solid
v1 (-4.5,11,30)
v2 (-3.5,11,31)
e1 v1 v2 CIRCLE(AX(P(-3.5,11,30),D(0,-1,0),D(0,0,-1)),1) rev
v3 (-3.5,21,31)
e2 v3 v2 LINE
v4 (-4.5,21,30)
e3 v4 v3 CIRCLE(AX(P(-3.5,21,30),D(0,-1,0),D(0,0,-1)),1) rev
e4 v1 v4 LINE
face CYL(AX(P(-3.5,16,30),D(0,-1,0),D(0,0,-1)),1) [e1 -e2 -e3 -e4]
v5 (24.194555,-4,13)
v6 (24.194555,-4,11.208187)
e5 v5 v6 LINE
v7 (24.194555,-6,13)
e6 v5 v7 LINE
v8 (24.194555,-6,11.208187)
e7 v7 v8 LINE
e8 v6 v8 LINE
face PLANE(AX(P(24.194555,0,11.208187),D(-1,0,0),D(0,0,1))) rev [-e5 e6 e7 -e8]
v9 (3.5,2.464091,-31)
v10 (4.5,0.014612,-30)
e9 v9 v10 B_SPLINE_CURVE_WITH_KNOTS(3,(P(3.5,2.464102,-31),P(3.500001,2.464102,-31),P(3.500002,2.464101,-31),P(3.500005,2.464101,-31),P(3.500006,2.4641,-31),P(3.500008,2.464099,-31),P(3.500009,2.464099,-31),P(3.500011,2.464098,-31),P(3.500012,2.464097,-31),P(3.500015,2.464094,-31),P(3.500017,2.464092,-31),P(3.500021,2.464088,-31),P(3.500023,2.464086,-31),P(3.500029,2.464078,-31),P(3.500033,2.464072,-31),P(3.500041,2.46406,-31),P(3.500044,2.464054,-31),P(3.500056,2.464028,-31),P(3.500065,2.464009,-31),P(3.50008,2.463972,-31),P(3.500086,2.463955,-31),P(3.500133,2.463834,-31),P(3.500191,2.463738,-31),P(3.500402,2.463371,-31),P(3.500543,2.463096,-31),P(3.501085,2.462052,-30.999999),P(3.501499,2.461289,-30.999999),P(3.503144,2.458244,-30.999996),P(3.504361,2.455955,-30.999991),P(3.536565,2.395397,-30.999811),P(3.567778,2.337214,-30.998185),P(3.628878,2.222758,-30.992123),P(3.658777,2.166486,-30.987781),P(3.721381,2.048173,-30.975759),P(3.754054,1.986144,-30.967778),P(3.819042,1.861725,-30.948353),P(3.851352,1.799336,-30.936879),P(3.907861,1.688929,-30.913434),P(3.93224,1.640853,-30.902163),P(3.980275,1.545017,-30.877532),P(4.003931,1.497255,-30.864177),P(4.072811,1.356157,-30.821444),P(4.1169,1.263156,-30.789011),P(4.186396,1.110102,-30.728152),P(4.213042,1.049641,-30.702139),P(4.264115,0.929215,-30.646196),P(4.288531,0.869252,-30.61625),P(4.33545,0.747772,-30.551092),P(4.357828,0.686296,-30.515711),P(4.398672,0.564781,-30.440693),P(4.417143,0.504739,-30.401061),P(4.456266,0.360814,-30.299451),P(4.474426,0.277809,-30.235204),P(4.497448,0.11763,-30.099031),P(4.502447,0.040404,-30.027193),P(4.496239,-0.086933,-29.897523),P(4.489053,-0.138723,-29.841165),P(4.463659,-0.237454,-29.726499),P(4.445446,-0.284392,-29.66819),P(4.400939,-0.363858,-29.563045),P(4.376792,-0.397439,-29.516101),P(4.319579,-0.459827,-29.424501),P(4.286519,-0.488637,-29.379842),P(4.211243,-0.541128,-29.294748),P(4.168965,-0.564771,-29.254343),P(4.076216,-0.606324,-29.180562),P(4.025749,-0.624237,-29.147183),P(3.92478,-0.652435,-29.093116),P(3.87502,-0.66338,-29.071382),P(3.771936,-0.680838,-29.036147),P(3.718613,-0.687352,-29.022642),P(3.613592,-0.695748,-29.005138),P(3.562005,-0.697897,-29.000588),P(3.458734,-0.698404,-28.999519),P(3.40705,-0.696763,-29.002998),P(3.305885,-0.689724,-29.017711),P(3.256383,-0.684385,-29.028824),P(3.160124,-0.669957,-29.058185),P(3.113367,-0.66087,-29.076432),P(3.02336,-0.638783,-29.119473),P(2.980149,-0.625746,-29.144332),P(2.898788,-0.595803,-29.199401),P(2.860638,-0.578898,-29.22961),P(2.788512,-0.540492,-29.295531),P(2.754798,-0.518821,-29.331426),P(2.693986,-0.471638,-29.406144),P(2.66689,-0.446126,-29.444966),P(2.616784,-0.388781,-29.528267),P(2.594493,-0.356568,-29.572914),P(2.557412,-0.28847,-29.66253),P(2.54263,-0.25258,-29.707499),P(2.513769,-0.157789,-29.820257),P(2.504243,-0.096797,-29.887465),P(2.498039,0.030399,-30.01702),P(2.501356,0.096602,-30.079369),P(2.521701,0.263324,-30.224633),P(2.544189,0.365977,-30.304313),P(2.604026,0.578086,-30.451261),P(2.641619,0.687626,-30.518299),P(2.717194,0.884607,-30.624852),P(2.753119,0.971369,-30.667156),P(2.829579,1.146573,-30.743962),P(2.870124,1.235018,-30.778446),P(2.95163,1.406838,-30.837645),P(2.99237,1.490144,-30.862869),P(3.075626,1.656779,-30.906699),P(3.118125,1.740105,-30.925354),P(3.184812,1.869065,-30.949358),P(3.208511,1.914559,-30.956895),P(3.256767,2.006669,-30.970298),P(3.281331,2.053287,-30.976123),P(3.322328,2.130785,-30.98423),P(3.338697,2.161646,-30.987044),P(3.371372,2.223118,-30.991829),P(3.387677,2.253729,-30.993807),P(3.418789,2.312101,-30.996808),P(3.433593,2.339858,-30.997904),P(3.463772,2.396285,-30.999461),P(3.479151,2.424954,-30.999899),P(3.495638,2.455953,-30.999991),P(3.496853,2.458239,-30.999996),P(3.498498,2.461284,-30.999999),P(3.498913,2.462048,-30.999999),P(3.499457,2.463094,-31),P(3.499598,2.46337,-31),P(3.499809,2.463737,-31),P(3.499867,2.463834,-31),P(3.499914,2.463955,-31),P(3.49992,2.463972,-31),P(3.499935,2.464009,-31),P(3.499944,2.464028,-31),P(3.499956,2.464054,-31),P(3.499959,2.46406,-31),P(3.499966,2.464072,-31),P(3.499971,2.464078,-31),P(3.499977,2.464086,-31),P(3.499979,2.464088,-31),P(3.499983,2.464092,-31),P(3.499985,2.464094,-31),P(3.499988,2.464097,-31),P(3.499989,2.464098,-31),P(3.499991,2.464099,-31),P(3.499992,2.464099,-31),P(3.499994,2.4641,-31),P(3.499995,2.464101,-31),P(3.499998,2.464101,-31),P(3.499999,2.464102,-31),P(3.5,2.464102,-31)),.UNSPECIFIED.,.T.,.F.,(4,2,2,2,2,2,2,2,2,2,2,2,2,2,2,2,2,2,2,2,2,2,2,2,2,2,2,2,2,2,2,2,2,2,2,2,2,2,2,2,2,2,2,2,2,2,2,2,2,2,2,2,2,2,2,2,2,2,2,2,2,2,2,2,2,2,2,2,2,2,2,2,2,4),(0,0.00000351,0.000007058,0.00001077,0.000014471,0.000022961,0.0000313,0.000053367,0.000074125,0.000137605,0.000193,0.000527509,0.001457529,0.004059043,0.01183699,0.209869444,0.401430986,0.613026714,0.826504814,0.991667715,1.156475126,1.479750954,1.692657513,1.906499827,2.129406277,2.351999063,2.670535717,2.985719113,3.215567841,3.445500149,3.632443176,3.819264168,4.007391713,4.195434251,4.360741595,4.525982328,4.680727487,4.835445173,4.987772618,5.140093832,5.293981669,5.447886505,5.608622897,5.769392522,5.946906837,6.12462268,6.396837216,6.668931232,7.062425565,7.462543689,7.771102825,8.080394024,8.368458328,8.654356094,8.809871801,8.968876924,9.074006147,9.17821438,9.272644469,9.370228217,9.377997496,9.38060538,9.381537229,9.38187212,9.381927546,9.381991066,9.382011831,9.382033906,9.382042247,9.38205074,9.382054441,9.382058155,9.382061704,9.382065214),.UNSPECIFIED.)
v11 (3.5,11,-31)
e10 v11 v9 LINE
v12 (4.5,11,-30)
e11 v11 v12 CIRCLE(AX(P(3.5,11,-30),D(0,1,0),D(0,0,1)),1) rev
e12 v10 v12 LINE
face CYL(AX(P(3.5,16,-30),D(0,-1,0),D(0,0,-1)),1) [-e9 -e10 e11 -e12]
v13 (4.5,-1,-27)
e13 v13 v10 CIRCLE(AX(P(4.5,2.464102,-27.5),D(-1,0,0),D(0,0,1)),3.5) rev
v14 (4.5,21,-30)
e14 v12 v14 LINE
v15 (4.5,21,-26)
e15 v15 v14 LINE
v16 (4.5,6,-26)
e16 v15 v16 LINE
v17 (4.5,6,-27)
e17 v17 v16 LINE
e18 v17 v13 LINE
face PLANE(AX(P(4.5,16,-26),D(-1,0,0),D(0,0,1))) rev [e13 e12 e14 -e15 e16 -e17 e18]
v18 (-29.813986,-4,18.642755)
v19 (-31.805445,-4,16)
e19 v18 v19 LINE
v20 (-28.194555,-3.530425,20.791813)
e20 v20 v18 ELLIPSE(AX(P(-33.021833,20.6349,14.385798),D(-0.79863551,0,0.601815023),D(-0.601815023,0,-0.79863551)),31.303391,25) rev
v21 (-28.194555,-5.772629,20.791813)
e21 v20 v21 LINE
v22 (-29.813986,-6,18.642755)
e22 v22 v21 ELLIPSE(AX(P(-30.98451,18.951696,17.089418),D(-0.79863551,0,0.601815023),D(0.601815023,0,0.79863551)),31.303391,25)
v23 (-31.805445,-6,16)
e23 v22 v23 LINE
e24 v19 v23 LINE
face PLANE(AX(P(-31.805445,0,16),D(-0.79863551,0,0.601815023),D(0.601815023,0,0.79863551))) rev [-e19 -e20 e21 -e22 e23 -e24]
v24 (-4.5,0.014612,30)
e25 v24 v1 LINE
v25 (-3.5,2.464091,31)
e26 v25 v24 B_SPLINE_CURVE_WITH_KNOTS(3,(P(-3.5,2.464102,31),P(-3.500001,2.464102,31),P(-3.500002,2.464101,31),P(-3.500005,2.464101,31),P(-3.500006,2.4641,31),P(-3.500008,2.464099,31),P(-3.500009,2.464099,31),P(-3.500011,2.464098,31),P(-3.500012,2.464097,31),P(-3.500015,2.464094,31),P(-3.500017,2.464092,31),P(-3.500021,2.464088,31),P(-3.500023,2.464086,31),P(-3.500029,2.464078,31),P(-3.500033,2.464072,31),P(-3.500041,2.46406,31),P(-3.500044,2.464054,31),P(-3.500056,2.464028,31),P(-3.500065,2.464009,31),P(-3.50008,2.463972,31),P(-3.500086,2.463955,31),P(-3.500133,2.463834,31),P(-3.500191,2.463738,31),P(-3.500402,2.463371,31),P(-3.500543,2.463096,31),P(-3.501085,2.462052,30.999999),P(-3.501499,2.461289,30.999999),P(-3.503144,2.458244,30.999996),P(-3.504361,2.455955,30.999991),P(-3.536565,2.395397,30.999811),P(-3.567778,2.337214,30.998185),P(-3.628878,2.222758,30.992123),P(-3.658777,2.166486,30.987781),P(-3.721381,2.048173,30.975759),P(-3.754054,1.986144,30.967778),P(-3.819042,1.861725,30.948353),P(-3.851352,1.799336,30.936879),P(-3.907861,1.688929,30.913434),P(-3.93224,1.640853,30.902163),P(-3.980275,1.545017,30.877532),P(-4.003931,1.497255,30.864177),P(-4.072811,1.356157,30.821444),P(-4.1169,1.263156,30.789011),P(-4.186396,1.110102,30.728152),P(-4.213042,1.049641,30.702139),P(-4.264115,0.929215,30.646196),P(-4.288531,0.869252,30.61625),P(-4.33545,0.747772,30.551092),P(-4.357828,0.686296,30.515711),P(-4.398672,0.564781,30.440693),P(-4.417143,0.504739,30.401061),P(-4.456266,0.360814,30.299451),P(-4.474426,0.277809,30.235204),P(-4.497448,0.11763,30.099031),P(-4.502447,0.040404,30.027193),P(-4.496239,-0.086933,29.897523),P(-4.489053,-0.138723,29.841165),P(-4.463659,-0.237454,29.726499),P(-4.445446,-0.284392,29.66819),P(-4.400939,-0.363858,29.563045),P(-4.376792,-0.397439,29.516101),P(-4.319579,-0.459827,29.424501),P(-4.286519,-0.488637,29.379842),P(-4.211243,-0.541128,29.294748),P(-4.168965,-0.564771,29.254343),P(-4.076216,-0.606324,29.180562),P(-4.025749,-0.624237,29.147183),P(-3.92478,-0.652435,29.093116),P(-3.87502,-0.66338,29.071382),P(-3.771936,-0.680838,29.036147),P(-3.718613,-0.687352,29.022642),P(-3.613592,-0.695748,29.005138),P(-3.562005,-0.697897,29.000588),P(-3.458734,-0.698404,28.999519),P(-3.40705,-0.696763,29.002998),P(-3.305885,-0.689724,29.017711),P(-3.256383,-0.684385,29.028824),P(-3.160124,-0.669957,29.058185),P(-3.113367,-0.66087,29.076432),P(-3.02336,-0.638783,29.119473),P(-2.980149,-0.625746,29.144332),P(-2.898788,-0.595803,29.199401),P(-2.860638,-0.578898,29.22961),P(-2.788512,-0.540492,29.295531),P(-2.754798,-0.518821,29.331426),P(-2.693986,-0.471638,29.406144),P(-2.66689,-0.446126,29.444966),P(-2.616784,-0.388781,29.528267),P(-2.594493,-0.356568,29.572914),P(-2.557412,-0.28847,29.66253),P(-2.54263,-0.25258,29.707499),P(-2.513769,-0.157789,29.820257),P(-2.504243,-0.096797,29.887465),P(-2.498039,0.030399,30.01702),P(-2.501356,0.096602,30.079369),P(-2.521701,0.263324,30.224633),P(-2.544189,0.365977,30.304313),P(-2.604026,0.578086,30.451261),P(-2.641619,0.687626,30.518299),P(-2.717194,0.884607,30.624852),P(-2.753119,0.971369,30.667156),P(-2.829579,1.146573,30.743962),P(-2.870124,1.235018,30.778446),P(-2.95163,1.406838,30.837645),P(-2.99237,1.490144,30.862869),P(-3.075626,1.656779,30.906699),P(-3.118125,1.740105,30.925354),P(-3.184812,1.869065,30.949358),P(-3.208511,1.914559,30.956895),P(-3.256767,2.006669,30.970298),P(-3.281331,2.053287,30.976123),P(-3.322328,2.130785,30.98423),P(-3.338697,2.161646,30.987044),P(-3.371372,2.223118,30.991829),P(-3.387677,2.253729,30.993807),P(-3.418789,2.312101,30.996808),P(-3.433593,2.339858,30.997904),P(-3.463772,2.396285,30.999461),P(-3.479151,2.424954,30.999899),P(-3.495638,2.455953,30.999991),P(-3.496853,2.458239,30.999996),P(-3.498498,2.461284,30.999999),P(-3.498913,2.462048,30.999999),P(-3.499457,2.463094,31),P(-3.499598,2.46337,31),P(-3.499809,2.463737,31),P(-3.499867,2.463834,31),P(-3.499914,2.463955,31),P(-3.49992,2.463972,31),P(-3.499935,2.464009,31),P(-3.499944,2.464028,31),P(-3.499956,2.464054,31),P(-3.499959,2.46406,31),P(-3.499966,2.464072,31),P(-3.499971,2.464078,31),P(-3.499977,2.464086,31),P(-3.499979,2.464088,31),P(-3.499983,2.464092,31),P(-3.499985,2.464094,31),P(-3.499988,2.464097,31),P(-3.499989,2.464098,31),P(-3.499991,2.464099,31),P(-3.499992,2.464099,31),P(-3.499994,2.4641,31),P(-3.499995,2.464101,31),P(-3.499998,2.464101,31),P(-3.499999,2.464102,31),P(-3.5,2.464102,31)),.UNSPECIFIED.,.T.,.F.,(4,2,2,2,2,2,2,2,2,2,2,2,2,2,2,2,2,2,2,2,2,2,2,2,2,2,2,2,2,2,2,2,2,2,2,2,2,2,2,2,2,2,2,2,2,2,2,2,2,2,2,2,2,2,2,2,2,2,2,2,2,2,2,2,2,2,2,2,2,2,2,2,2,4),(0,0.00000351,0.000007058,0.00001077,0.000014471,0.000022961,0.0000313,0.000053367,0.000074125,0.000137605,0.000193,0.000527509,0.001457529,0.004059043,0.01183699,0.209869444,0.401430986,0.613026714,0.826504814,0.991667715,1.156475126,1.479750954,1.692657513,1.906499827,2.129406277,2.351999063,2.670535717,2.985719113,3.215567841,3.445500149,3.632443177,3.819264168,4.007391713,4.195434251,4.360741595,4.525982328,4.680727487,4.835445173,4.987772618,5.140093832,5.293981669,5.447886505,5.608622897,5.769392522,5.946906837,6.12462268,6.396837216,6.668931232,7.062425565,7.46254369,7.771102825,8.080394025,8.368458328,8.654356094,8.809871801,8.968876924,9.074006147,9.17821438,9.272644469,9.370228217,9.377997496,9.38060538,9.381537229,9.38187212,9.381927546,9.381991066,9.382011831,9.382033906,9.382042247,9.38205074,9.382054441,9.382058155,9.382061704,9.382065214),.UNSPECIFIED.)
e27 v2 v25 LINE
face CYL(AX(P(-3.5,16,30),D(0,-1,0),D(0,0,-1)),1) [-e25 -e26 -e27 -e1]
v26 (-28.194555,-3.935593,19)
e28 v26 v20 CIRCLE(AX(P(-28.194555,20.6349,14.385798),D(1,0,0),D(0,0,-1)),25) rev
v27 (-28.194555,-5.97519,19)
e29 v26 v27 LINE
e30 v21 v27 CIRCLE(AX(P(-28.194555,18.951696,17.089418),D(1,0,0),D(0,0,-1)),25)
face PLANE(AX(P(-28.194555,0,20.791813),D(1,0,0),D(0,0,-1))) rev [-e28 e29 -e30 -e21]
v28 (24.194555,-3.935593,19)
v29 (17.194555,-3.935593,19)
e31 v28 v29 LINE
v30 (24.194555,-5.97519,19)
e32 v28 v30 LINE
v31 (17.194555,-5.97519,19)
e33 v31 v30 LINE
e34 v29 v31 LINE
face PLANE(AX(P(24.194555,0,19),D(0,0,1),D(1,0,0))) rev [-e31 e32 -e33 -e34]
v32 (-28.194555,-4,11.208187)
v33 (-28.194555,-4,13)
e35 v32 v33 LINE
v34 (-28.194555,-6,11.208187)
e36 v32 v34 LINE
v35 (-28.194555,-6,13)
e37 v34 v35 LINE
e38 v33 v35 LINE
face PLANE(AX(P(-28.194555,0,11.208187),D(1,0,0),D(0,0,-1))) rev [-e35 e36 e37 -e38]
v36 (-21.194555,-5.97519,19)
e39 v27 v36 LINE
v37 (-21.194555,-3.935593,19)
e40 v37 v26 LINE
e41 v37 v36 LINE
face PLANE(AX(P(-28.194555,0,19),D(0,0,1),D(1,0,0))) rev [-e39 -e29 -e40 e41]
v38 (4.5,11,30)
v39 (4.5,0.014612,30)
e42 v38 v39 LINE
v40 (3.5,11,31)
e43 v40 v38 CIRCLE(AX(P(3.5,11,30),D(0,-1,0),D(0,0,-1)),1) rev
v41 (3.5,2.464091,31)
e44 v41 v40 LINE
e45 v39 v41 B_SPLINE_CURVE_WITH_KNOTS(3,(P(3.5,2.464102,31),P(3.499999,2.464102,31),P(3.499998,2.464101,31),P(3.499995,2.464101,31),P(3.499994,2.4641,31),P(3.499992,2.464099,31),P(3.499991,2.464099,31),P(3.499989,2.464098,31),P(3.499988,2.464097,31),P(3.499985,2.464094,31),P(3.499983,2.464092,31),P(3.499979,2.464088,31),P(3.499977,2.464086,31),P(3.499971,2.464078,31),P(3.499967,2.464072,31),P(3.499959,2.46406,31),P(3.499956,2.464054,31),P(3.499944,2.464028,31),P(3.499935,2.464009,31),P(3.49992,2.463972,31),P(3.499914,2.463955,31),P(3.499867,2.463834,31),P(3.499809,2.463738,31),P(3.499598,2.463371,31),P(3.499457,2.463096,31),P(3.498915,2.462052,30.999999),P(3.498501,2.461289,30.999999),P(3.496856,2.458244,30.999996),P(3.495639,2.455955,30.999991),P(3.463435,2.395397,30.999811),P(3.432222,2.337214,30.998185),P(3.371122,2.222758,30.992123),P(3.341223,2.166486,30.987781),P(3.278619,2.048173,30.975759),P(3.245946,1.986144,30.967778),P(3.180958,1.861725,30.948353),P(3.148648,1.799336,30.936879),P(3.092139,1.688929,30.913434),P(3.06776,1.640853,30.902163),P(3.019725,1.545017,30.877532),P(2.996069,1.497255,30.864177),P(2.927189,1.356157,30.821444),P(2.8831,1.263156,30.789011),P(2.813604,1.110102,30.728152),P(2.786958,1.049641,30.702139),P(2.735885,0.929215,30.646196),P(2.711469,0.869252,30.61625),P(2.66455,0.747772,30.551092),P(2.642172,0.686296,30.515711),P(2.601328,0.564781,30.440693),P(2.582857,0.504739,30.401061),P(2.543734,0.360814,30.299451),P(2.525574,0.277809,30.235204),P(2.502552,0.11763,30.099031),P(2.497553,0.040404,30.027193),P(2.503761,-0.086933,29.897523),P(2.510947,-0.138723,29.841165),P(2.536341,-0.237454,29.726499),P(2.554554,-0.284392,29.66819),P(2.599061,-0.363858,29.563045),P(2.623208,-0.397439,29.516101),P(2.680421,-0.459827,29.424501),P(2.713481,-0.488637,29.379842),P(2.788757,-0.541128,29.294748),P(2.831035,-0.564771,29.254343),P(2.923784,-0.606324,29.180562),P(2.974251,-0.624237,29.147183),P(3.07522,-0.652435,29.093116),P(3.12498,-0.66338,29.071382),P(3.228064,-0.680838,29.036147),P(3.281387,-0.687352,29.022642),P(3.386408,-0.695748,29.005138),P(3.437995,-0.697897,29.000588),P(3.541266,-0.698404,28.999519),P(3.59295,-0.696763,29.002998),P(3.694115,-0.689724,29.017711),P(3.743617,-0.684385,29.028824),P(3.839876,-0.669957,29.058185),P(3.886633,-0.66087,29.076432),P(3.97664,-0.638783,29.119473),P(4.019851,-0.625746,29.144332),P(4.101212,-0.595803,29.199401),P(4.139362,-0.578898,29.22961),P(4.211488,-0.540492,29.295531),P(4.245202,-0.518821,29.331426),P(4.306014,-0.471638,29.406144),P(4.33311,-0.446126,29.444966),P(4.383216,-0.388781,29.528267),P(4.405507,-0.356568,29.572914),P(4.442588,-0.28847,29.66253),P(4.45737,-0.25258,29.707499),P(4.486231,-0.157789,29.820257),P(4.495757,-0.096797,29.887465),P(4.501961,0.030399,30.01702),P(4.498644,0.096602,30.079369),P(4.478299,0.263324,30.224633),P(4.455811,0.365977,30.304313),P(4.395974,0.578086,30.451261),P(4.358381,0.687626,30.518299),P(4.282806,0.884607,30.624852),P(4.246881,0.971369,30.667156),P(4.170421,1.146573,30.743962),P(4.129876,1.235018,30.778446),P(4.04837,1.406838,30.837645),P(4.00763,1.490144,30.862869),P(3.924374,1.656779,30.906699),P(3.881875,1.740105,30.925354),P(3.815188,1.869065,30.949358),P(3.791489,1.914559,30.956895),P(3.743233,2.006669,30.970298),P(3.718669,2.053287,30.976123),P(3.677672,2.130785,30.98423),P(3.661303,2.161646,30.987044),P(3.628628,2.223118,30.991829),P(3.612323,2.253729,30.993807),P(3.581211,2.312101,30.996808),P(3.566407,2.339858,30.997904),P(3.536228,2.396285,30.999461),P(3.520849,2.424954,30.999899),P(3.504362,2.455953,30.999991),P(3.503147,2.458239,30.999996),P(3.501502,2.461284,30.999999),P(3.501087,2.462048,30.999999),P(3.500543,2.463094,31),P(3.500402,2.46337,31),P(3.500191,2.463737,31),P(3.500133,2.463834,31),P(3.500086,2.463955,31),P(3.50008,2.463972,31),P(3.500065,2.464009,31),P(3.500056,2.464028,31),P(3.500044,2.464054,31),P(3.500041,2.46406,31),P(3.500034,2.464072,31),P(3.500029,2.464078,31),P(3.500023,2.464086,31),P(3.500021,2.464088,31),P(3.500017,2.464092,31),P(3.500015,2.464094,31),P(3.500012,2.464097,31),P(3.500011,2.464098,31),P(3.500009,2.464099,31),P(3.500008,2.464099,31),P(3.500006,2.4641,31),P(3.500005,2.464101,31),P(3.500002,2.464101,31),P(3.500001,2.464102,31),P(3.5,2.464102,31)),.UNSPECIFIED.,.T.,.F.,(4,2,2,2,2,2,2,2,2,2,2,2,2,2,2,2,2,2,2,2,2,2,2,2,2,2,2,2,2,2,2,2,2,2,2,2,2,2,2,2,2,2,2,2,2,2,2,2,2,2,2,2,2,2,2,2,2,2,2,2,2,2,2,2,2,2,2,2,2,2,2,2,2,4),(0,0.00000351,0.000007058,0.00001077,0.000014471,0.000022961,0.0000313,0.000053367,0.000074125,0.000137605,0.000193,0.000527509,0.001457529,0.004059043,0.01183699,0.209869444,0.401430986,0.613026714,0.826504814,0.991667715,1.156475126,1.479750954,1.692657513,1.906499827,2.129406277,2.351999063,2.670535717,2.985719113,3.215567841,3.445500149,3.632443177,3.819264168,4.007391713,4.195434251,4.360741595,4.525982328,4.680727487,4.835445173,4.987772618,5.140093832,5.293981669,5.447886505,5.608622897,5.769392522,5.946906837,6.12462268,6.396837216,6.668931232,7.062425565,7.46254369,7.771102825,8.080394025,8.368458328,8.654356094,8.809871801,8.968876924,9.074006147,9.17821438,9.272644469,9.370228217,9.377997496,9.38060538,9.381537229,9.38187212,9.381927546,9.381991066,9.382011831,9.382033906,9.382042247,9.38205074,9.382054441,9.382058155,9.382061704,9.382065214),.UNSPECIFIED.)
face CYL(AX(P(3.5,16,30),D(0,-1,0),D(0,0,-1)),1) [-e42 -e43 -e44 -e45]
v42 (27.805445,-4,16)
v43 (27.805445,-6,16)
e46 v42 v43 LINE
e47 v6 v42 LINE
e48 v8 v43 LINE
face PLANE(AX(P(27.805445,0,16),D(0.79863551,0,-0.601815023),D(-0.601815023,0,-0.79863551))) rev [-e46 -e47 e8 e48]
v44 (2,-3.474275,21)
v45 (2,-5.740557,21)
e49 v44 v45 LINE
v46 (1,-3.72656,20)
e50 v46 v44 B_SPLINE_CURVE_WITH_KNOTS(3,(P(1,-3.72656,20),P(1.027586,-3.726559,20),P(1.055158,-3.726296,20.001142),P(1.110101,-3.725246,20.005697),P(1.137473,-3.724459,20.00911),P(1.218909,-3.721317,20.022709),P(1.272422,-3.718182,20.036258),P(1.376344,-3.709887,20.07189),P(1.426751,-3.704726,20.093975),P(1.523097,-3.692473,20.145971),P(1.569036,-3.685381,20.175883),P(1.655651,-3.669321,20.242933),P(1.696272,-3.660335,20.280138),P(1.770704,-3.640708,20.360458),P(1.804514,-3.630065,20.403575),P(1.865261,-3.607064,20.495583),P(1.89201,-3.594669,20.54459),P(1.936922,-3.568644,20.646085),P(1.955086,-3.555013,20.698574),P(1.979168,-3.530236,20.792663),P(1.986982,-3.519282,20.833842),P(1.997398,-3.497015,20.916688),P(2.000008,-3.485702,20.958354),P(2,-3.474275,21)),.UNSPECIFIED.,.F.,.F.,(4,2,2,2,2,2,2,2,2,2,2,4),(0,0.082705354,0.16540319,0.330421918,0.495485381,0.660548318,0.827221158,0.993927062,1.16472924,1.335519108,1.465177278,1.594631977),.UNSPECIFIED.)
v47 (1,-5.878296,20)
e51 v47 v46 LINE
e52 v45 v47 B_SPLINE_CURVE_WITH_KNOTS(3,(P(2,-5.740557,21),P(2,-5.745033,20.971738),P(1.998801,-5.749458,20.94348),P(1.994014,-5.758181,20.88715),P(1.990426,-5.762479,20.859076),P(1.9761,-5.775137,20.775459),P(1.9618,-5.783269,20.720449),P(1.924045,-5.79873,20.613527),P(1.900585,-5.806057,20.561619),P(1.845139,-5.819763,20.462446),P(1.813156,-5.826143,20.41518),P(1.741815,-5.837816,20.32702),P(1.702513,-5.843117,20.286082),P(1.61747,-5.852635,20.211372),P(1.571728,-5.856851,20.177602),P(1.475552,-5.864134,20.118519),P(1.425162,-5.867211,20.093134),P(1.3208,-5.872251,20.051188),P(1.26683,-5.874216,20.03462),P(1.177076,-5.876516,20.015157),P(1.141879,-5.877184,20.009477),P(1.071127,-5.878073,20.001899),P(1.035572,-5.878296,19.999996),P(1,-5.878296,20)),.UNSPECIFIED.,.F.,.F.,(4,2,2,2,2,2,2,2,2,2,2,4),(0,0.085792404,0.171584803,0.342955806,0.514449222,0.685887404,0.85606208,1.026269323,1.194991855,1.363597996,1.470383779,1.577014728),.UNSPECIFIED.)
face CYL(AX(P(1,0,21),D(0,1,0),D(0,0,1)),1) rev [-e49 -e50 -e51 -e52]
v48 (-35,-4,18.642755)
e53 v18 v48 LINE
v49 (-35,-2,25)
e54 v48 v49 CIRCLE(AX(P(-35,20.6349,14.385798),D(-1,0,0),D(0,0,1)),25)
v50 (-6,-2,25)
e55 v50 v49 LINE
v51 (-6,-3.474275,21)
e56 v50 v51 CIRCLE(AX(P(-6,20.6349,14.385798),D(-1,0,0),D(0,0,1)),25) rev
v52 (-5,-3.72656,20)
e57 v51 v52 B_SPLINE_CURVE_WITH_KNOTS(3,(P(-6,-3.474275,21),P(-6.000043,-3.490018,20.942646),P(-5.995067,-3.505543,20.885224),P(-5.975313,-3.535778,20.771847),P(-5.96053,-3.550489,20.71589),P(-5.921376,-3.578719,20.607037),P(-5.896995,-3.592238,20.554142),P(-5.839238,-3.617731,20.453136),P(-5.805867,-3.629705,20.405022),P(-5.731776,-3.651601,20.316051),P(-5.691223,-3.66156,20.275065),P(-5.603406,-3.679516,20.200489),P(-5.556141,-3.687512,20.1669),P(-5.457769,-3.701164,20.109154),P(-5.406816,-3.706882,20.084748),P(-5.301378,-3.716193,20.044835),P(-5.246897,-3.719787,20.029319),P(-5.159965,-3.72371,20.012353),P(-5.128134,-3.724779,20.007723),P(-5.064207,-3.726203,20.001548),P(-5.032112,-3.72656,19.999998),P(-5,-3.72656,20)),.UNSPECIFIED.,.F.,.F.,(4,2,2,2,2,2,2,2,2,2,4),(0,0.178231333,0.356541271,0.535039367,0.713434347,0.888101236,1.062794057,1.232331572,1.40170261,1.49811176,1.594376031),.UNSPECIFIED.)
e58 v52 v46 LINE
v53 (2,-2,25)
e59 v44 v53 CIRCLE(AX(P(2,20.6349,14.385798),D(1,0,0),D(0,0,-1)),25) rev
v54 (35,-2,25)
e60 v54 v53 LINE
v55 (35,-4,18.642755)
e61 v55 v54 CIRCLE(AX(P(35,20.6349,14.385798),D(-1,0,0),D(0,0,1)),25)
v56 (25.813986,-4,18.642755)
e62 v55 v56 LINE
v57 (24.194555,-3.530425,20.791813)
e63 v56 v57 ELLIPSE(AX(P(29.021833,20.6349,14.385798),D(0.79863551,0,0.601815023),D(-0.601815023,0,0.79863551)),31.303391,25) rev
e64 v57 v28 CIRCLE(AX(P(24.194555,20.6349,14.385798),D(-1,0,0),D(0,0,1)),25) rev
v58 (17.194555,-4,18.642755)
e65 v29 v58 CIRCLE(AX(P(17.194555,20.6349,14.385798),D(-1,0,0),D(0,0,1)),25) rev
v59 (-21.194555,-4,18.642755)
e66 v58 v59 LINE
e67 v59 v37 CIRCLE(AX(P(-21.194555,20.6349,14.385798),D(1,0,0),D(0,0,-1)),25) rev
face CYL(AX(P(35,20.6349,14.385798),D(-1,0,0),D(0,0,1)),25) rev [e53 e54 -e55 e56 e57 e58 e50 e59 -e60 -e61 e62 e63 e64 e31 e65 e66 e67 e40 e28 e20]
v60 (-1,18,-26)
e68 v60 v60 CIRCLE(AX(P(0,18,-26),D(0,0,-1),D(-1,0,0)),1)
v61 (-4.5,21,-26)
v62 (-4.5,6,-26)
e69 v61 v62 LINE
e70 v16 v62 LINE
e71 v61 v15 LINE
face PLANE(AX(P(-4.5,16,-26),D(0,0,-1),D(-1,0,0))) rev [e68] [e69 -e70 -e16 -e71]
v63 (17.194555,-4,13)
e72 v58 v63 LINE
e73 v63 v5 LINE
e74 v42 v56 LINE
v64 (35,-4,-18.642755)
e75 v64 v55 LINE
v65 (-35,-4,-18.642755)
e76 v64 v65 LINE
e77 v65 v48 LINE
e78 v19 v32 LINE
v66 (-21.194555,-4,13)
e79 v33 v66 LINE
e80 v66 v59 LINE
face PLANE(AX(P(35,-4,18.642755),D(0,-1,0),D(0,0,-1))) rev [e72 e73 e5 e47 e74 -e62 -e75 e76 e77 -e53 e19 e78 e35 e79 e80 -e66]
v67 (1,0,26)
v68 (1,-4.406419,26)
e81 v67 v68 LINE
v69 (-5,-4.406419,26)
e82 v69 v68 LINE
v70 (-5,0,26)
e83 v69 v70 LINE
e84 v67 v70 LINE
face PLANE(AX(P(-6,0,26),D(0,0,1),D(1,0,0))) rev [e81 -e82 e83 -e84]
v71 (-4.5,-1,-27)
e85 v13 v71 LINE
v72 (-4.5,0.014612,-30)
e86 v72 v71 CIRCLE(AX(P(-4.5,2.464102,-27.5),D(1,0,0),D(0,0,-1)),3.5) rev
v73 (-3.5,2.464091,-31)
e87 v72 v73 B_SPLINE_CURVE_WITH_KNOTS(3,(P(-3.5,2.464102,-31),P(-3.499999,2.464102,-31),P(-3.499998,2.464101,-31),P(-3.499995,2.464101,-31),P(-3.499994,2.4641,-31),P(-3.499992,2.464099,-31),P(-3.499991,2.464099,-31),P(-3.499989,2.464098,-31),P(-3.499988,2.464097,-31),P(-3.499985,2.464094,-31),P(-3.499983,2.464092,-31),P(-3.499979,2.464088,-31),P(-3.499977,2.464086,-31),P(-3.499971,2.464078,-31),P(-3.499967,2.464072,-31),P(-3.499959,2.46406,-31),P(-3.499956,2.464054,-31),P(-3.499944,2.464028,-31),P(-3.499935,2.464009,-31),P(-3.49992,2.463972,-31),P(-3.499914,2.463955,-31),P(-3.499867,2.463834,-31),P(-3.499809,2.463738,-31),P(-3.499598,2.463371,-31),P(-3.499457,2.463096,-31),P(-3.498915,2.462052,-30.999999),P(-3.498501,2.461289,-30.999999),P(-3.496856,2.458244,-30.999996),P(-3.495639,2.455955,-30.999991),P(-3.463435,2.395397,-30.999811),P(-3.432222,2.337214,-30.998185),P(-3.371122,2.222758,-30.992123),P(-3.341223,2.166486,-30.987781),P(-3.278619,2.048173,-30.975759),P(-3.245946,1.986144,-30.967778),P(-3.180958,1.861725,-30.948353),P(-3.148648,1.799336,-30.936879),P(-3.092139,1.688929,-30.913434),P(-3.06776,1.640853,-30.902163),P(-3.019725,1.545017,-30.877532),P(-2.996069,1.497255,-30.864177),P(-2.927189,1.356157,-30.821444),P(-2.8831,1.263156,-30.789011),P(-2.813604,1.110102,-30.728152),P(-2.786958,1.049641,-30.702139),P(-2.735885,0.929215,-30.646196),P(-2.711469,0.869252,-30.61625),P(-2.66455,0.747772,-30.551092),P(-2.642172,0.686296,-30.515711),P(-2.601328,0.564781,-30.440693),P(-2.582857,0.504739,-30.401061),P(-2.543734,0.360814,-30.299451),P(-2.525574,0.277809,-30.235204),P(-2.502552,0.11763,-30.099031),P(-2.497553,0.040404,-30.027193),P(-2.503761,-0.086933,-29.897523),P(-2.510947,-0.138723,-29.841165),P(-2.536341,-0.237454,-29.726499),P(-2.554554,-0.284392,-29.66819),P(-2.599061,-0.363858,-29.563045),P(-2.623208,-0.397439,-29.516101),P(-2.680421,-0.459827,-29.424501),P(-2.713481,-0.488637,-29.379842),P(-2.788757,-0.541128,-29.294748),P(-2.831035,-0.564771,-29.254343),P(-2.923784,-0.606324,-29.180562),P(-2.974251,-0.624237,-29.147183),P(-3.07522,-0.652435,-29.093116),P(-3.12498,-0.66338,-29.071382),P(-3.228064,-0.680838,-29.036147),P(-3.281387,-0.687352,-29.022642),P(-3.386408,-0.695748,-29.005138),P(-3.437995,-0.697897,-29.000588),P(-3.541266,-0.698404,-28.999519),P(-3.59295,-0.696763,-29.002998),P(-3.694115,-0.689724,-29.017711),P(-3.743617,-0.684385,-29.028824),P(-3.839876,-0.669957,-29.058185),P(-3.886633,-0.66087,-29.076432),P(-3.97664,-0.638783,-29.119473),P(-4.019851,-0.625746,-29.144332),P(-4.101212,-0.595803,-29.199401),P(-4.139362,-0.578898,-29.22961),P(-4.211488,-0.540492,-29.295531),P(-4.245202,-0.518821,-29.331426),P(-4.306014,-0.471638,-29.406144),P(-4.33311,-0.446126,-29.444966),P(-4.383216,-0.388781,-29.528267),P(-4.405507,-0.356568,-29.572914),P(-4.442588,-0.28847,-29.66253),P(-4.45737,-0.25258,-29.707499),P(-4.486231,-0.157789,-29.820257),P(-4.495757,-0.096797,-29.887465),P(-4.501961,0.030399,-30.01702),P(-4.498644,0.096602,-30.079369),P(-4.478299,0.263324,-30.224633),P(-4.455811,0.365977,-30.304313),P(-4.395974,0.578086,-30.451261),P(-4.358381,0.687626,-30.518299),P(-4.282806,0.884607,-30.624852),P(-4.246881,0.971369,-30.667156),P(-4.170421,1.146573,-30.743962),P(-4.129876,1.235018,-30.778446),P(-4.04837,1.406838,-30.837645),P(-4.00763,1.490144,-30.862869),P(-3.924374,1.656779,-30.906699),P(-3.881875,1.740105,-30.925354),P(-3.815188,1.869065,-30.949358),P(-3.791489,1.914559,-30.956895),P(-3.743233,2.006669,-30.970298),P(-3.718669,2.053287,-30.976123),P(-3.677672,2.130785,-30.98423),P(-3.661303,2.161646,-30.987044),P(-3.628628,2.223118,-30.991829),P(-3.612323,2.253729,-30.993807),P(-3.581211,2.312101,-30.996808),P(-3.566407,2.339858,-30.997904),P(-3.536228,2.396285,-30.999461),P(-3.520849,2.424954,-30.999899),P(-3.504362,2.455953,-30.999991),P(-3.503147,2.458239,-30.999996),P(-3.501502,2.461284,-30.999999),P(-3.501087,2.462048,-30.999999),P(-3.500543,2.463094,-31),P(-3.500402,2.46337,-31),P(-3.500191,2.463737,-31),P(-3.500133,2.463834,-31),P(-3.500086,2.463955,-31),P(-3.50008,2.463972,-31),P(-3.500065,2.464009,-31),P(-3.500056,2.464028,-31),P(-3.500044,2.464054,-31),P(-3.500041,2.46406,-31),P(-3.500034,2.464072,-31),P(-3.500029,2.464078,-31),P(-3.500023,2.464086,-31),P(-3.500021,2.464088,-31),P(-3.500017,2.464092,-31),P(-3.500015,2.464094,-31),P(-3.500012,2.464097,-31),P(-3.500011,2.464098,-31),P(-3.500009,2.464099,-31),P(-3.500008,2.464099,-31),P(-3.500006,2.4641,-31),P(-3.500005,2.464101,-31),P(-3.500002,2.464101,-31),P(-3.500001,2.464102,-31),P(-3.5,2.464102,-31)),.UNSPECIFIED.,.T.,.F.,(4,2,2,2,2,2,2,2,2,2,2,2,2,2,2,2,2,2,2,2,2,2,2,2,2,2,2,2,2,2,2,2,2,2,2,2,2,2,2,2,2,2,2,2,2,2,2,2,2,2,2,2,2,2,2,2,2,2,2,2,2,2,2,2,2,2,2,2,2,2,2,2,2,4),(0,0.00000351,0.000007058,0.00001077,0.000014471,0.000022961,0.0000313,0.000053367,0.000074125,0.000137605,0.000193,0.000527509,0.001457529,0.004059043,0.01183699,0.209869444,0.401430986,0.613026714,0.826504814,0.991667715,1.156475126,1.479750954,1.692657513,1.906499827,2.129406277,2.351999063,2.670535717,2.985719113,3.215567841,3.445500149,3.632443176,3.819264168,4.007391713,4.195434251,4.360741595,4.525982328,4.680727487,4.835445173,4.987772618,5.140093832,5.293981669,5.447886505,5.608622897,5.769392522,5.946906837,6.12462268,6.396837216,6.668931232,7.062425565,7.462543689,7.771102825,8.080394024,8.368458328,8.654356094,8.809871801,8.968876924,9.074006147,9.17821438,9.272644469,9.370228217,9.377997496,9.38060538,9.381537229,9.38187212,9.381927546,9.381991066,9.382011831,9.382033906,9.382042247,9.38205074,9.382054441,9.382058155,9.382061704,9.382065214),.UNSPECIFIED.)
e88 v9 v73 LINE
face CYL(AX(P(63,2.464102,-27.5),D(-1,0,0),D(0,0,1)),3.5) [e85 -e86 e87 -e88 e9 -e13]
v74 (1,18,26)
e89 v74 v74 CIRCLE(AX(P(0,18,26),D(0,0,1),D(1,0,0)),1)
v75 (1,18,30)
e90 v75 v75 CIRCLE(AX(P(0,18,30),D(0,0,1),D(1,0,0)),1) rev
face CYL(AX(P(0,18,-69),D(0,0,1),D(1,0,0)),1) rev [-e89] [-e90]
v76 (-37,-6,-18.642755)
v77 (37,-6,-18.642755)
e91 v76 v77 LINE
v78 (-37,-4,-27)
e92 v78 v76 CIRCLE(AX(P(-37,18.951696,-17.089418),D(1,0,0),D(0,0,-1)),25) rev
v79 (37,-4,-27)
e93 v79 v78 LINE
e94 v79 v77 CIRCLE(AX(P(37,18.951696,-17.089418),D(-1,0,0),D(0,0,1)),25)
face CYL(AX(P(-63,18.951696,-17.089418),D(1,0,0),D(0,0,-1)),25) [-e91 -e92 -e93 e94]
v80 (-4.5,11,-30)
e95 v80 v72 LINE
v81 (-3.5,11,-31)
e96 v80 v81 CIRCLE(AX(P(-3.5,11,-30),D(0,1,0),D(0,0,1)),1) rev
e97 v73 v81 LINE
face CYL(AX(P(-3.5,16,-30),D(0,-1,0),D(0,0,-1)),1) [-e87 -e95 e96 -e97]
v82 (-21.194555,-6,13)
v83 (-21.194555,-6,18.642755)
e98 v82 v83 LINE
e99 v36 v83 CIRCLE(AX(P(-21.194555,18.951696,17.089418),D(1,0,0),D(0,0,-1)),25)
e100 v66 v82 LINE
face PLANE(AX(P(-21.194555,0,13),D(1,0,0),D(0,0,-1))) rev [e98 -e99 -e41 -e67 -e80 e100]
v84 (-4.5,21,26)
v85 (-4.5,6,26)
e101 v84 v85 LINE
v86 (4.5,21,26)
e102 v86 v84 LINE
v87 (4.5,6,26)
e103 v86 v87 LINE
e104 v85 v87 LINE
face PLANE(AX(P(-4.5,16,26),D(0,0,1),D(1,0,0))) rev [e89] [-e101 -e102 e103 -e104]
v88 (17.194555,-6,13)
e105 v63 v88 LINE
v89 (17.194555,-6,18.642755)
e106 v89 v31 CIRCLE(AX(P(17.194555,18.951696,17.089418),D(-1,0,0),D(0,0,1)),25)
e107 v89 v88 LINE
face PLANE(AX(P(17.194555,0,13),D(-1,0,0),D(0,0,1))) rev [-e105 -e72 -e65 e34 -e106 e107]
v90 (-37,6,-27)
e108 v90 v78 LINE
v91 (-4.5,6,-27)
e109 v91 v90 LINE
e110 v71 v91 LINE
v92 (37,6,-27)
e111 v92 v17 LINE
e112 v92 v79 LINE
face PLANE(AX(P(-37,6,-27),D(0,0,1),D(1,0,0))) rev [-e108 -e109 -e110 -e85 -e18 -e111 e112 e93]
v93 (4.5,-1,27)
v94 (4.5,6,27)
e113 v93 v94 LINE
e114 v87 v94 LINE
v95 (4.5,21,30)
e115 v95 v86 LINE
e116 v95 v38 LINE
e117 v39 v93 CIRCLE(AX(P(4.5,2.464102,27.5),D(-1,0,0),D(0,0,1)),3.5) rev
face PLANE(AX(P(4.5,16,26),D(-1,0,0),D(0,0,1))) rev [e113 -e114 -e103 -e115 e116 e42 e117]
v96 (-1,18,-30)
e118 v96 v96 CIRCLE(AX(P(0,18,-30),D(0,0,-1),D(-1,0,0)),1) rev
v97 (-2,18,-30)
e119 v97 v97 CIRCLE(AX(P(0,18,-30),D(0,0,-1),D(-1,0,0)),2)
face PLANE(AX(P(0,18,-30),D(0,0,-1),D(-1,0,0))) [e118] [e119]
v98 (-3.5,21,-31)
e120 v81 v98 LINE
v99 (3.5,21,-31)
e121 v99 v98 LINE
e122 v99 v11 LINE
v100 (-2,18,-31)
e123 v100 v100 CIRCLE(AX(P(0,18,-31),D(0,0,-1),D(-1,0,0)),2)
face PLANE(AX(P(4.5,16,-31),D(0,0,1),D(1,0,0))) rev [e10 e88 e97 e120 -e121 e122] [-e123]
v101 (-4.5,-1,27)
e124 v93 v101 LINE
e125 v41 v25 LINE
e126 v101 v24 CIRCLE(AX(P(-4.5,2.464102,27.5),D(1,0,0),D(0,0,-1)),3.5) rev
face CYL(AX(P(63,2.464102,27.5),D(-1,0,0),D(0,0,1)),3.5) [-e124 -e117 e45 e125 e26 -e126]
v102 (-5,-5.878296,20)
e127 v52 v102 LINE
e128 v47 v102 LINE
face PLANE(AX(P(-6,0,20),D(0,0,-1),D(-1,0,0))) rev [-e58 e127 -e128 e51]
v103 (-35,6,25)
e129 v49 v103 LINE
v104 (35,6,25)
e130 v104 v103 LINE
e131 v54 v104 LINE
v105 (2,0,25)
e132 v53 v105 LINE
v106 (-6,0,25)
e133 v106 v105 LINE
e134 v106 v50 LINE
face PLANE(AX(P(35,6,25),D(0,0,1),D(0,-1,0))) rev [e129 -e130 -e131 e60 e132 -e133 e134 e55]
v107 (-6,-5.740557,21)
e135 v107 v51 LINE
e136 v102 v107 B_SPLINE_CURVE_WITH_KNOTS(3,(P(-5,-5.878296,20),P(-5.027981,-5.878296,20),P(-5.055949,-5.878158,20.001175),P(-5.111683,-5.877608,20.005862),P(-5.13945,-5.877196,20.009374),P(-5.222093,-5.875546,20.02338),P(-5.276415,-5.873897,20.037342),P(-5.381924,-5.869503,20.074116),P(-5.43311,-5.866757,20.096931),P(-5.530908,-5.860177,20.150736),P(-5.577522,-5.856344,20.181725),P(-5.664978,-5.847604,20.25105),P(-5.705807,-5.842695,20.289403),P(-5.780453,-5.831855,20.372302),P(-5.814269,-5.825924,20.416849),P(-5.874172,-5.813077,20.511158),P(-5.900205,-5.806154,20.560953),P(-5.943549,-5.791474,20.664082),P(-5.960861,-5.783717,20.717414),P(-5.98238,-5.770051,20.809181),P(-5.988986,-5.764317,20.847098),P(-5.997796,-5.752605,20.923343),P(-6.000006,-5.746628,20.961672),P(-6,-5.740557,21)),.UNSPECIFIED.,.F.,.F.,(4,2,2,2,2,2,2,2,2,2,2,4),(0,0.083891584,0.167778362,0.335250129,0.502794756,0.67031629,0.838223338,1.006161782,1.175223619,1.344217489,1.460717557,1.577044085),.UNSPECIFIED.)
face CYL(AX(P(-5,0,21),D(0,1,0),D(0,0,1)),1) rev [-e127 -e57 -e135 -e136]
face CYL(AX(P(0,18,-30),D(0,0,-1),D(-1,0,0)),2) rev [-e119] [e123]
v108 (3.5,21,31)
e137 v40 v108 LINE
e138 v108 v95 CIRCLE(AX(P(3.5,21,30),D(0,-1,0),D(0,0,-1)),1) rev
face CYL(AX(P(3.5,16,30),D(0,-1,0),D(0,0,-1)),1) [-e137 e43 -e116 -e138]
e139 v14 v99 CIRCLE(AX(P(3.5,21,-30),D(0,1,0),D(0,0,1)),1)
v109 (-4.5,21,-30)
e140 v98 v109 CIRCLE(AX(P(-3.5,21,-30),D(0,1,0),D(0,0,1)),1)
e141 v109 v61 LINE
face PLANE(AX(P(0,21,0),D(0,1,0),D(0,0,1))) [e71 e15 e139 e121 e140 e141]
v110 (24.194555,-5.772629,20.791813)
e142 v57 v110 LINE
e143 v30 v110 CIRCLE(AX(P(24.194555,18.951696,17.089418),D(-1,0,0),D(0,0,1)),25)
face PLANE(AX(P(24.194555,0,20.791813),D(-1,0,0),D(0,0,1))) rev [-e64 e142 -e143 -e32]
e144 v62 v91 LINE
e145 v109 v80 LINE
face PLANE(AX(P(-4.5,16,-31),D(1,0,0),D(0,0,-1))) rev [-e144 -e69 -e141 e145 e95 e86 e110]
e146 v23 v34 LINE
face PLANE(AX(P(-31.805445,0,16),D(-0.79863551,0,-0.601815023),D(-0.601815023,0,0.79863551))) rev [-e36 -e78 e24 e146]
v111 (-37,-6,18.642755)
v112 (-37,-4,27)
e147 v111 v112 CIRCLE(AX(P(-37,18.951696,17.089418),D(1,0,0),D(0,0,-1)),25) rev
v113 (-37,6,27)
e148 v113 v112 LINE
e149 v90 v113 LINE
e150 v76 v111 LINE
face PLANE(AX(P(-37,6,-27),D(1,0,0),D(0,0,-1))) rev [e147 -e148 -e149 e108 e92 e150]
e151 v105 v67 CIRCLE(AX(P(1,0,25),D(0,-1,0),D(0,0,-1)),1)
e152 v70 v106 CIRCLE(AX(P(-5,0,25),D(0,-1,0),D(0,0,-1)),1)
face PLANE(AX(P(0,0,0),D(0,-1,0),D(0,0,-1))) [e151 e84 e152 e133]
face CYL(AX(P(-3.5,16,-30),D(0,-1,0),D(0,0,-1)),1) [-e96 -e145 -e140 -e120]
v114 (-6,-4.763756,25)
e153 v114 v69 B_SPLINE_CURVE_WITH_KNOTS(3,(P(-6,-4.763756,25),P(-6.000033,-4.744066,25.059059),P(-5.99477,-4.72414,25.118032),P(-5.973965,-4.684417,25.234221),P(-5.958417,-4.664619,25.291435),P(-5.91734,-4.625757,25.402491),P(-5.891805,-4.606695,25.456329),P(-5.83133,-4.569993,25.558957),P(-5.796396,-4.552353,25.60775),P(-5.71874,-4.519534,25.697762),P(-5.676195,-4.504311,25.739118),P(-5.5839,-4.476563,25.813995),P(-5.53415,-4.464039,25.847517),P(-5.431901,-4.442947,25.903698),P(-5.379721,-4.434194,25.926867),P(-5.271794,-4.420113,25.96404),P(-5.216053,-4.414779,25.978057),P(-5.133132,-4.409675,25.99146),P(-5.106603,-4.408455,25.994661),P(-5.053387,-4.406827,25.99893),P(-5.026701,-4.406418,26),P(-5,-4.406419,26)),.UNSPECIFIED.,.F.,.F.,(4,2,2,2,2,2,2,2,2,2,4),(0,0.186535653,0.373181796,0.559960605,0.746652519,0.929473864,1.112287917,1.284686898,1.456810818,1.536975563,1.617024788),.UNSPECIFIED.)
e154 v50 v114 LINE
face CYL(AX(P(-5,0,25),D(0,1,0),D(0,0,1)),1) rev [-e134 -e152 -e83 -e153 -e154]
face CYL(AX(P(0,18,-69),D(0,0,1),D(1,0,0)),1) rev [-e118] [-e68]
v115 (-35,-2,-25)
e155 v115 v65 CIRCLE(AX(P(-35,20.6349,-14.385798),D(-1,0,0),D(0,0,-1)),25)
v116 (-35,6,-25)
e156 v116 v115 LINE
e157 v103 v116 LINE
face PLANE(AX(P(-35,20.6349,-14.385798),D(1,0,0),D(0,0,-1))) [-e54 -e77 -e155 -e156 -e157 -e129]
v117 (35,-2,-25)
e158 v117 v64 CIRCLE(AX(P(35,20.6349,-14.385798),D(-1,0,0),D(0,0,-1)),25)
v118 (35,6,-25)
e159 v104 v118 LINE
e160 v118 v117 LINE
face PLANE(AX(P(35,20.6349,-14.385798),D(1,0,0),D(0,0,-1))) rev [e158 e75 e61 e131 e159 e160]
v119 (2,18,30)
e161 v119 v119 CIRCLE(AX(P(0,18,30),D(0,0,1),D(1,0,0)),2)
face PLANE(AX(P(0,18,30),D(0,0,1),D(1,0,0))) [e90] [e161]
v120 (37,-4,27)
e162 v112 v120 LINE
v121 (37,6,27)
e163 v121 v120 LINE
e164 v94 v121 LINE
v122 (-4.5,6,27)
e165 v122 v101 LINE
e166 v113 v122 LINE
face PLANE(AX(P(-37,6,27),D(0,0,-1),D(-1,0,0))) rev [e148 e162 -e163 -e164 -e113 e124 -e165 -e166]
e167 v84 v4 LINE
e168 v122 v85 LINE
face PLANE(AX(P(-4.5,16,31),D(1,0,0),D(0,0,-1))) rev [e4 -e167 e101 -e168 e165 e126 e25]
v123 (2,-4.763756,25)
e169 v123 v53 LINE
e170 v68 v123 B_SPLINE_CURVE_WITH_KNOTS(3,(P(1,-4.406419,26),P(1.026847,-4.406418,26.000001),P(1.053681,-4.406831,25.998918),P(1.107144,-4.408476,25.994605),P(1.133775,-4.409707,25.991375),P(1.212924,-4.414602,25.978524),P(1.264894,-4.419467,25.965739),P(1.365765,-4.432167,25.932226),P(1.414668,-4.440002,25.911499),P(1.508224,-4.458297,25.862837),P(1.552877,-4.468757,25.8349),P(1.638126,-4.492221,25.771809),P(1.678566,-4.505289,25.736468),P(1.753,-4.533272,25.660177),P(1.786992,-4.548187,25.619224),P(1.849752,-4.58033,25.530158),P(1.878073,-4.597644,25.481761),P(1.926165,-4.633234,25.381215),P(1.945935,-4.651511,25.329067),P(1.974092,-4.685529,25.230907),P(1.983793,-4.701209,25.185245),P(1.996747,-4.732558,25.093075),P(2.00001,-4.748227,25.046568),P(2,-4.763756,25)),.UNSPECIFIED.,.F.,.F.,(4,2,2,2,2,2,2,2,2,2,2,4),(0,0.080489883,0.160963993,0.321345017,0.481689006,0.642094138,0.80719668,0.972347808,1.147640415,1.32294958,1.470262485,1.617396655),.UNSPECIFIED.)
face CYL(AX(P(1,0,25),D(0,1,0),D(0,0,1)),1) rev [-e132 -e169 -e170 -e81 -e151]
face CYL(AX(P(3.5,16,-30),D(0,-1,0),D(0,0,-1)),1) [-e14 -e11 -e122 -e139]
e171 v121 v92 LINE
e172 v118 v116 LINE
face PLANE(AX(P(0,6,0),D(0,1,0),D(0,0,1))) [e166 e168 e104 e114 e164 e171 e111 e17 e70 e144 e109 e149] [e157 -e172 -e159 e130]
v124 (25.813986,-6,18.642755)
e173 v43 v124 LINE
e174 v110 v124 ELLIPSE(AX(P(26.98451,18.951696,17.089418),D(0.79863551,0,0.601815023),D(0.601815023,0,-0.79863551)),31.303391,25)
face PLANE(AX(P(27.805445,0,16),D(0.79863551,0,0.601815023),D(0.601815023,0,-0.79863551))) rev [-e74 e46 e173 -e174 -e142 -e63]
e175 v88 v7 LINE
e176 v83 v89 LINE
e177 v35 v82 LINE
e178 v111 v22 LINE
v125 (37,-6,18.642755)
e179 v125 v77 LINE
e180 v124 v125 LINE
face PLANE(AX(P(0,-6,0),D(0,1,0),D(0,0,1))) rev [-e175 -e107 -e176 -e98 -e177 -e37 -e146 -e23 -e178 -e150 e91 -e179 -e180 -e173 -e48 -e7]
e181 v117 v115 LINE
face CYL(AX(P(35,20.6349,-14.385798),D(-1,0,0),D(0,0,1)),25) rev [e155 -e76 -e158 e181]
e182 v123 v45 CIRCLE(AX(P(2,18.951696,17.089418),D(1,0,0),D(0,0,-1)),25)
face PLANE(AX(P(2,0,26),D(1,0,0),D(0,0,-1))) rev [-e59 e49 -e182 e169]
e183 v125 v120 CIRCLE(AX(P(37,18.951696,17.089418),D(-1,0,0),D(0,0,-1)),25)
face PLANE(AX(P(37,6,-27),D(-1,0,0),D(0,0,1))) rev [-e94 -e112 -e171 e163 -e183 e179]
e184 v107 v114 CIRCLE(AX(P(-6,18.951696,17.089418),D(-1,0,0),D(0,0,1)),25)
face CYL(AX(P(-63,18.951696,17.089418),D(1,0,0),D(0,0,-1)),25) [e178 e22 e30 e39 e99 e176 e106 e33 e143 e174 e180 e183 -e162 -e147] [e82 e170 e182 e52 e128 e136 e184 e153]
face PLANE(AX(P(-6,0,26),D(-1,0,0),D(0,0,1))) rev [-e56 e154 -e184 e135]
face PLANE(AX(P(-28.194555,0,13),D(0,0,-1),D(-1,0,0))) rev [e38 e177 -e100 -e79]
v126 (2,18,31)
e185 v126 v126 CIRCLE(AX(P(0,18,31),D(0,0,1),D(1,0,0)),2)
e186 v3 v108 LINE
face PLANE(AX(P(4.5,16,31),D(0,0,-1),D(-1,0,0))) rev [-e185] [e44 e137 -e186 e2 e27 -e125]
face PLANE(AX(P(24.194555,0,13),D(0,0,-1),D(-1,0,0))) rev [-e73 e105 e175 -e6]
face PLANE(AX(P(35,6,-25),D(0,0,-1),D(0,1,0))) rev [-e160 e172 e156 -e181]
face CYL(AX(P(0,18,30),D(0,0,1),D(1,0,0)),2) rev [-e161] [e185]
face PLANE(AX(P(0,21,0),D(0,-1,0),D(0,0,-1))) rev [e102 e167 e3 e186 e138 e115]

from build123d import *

# Parameters (mm, degrees)
CROQUIS1_W              = 74
CROQUIS1_H              = 54
SALIENTE_EXTRUIR1_DEPTH = 6
CROQUIS3_W              = 9
CROQUIS3_H              = 5
SALIENTE_EXTRUIR2_DEPTH = 10
REDONDEO1_R             = 1
CORTAR_EXTRUIR1_DEPTH   = 100
CORTAR_EXTRUIR2_DEPTH   = 100
CORTAR_EXTRUIR3_DEPTH   = 70
CROQUIS8_W              = 8
CROQUIS8_H              = 6
CORTAR_EXTRUIR4_DEPTH   = 6
REDONDEO2_R             = 1
CROQUIS11_W             = 9
CROQUIS11_H             = 5
SALIENTE_EXTRUIR3_DEPTH = 5
REDONDEO3_R             = 1
CROQUIS17_R             = 1
CORTAR_EXTRUIR10_DEPTH  = 100
CROQUIS18_R             = 2
CORTAR_EXTRUIR11_DEPTH  = 1
CORTAR_EXTRUIR12_START  = -1
CROQUIS19_R             = 2
CORTAR_EXTRUIR12_DEPTH  = 1
CROQUIS12_R             = 1
CORTAR_EXTRUIR7_DEPTH   = 100
CROQUIS15_R             = 2
CORTAR_EXTRUIR8_DEPTH   = 1
CORTAR_EXTRUIR9_START   = -1
CROQUIS16_R             = 2
CORTAR_EXTRUIR9_DEPTH   = 1


with BuildPart() as part:
    # Croquis1 → Saliente-Extruir1 (new, symmetric)
    with BuildSketch(Plane(origin=(0, 0, 0), x_dir=(1, 0, 0), z_dir=(0, 1, 0))):
        Rectangle(CROQUIS1_W, CROQUIS1_H)
    extrude(amount=SALIENTE_EXTRUIR1_DEPTH, both=True)

    # Croquis3 → Saliente-Extruir2 (add, symmetric)
    with BuildSketch(Plane(origin=(0, 6, 0), x_dir=(1, 0, 0), z_dir=(0, 1, 0))):
        with Locations((0, -28.5)):
            Rectangle(CROQUIS3_W, CROQUIS3_H)
        with Locations((0, 28.5)):
            Rectangle(CROQUIS3_W, CROQUIS3_H)
    extrude(amount=SALIENTE_EXTRUIR2_DEPTH, both=True)

    # Redondeo1
    redondeo1_edges = [part.edges().sort_by_distance(p)[0] for p in [
        (4.5, 6, 31),
        (-4.5, 6, 31),
        (4.5, 6, -31),
        (-4.5, 6, -31),
    ]]
    fillet(redondeo1_edges, radius=REDONDEO1_R)

    # Croquis5 → Cortar-Extruir1 (cut)
    with BuildSketch(Plane(origin=(37, 0, 0), x_dir=(0, 0, -1), z_dir=(1, 0, 0))):
        with BuildLine():
            Line((-31, -1.820778385), (-31, -6))
            Line((-31, -6), (-18.642754783, -6))
            ThreePointArc((-18.642754783, -6), (-25.098766863, -4.730582529), (-31, -1.820778385))
        make_face()
        with BuildLine():
            Line((31, -1.820778385), (31, -6))
            Line((31, -6), (18.642754783, -6))
            ThreePointArc((18.642754783, -6), (25.098766863, -4.730582529), (31, -1.820778385))
        make_face()
    extrude(amount=-CORTAR_EXTRUIR1_DEPTH, mode=Mode.SUBTRACT)

    # Croquis6 → Cortar-Extruir2 (cut)
    with BuildSketch(Plane.ZY.offset(37)):
        with BuildLine():
            Line((-27, -1), (-27, -4))
            Line((-27, -4), (-31, -4))
            Line((-31, -4), (-33.432664366, -4))
            Line((-33.432664366, -4), (-33.432664366, 2.46409105))
            Line((-33.432664366, 2.46409105), (-31, 2.46409105))
            ThreePointArc((-31, 2.46409105), (-29.791283854, -0.181653154), (-27, -1))
        make_face()
        with BuildLine():
            Line((27, -1), (27, -4))
            Line((27, -4), (31, -4))
            Line((31, -4), (33.432664366, -4))
            Line((33.432664366, -4), (33.432664366, 2.46409105))
            Line((33.432664366, 2.46409105), (31, 2.46409105))
            ThreePointArc((31, 2.46409105), (29.791283854, -0.181653154), (27, -1))
        make_face()
    extrude(amount=-CORTAR_EXTRUIR2_DEPTH, mode=Mode.SUBTRACT)

    # Croquis7 → Cortar-Extruir3 (cut)
    with BuildSketch(Plane.ZY.offset(35)):
        with BuildLine():
            Line((-25, 6), (25, 6))
            Line((25, 6), (25, -2))
            ThreePointArc((25, -2), (21.888320303, -3.212786251), (18.642754783, -4))
            Line((18.642754783, -4), (-18.642754783, -4))
            ThreePointArc((-18.642754783, -4), (-21.888320303, -3.212786251), (-25, -2))
            Line((-25, -2), (-25, 6))
        make_face()
    extrude(amount=-CORTAR_EXTRUIR3_DEPTH, mode=Mode.SUBTRACT)

    # Croquis8 → Cortar-Extruir4 (cut)
    with BuildSketch(Plane.XZ.offset(6)):
        Polygon((-31.805445069, 16), (-28.194554931, 11.20818694), (-28.194554931, 13), (-21.194554931, 13), (-21.194554931, 19), (-28.194554931, 19), (-28.194554931, 20.79181306), align=None)
        Polygon((24.194554931, 13), (17.194554931, 13), (17.194554931, 19), (24.194554931, 19), (24.194554931, 20.79181306), (27.805445069, 16), (24.194554931, 11.20818694), align=None)
        with Locations((-2, 23)):
            Rectangle(CROQUIS8_W, CROQUIS8_H)
    extrude(amount=-CORTAR_EXTRUIR4_DEPTH, mode=Mode.SUBTRACT)

    # Redondeo2
    redondeo2_edges = [part.edges().sort_by_distance(p)[0] for p in [
        (-6, -4.802427791, 20),
        (2, -4.802427791, 20),
        (2, -2.203209257, 26),
        (-6, -2.203209257, 26),
    ]]
    fillet(redondeo2_edges, radius=REDONDEO2_R - 0.0001)  # a hair under: the kernel refuses the full size

    # Croquis11 → Saliente-Extruir3 (add, symmetric)
    with BuildSketch(Plane(origin=(0, 16, 0), x_dir=(1, 0, 0), z_dir=(0, 1, 0))):
        with Locations((0, -28.5)):
            Rectangle(CROQUIS11_W, CROQUIS11_H)
        with Locations((0, 28.5)):
            Rectangle(CROQUIS11_W, CROQUIS11_H)
    extrude(amount=SALIENTE_EXTRUIR3_DEPTH, both=True)

    # Redondeo3
    redondeo3_edges = [part.edges().sort_by_distance(p)[0] for p in [
        (-4.5, 16, -31),
        (4.5, 16, -31),
        (-4.5, 16, 31),
        (4.5, 16, 31),
    ]]
    fillet(redondeo3_edges, radius=REDONDEO3_R)

    # Croquis17 → Cortar-Extruir10 (cut)
    with BuildSketch(Plane.XY.offset(31)):
        with Locations((0, 18)):
            Circle(CROQUIS17_R)
    extrude(amount=-CORTAR_EXTRUIR10_DEPTH, mode=Mode.SUBTRACT)

    # Croquis18 → Cortar-Extruir11 (cut)
    with BuildSketch(Plane.XY.offset(31)):
        with Locations((0, 18)):
            Circle(CROQUIS18_R)
    extrude(amount=-CORTAR_EXTRUIR11_DEPTH, mode=Mode.SUBTRACT)

    # Croquis19 → Cortar-Extruir12 (cut)
    with BuildSketch(Plane(origin=(0, 0, -31), x_dir=(-1, 0, 0), z_dir=(0, 0, -1)).offset(CORTAR_EXTRUIR12_START)):
        with Locations(Location((0, 18, 0), (0, 0, 180))):
            Circle(CROQUIS19_R)
    extrude(amount=CORTAR_EXTRUIR12_DEPTH, mode=Mode.SUBTRACT)

    # Croquis12 → Cortar-Extruir7 (cut)
    with BuildSketch(Plane.XY.offset(31)):
        with Locations(Location((0, 18, 0), (0, 0, 180))):
            Circle(CROQUIS12_R)
    extrude(amount=-CORTAR_EXTRUIR7_DEPTH, mode=Mode.SUBTRACT)

    # Croquis15 → Cortar-Extruir8 (cut)
    with BuildSketch(Plane.XY.offset(31)):
        with Locations((0, 18)):
            Circle(CROQUIS15_R)
    extrude(amount=-CORTAR_EXTRUIR8_DEPTH, mode=Mode.SUBTRACT)

    # Croquis16 → Cortar-Extruir9 (cut)
    with BuildSketch(Plane(origin=(0, 0, -31), x_dir=(-1, 0, 0), z_dir=(0, 0, -1)).offset(CORTAR_EXTRUIR9_START)):
        with Locations(Location((0, 18, 0), (0, 0, 180))):
            Circle(CROQUIS16_R)
    extrude(amount=CORTAR_EXTRUIR9_DEPTH, mode=Mode.SUBTRACT)


solid = part.part
